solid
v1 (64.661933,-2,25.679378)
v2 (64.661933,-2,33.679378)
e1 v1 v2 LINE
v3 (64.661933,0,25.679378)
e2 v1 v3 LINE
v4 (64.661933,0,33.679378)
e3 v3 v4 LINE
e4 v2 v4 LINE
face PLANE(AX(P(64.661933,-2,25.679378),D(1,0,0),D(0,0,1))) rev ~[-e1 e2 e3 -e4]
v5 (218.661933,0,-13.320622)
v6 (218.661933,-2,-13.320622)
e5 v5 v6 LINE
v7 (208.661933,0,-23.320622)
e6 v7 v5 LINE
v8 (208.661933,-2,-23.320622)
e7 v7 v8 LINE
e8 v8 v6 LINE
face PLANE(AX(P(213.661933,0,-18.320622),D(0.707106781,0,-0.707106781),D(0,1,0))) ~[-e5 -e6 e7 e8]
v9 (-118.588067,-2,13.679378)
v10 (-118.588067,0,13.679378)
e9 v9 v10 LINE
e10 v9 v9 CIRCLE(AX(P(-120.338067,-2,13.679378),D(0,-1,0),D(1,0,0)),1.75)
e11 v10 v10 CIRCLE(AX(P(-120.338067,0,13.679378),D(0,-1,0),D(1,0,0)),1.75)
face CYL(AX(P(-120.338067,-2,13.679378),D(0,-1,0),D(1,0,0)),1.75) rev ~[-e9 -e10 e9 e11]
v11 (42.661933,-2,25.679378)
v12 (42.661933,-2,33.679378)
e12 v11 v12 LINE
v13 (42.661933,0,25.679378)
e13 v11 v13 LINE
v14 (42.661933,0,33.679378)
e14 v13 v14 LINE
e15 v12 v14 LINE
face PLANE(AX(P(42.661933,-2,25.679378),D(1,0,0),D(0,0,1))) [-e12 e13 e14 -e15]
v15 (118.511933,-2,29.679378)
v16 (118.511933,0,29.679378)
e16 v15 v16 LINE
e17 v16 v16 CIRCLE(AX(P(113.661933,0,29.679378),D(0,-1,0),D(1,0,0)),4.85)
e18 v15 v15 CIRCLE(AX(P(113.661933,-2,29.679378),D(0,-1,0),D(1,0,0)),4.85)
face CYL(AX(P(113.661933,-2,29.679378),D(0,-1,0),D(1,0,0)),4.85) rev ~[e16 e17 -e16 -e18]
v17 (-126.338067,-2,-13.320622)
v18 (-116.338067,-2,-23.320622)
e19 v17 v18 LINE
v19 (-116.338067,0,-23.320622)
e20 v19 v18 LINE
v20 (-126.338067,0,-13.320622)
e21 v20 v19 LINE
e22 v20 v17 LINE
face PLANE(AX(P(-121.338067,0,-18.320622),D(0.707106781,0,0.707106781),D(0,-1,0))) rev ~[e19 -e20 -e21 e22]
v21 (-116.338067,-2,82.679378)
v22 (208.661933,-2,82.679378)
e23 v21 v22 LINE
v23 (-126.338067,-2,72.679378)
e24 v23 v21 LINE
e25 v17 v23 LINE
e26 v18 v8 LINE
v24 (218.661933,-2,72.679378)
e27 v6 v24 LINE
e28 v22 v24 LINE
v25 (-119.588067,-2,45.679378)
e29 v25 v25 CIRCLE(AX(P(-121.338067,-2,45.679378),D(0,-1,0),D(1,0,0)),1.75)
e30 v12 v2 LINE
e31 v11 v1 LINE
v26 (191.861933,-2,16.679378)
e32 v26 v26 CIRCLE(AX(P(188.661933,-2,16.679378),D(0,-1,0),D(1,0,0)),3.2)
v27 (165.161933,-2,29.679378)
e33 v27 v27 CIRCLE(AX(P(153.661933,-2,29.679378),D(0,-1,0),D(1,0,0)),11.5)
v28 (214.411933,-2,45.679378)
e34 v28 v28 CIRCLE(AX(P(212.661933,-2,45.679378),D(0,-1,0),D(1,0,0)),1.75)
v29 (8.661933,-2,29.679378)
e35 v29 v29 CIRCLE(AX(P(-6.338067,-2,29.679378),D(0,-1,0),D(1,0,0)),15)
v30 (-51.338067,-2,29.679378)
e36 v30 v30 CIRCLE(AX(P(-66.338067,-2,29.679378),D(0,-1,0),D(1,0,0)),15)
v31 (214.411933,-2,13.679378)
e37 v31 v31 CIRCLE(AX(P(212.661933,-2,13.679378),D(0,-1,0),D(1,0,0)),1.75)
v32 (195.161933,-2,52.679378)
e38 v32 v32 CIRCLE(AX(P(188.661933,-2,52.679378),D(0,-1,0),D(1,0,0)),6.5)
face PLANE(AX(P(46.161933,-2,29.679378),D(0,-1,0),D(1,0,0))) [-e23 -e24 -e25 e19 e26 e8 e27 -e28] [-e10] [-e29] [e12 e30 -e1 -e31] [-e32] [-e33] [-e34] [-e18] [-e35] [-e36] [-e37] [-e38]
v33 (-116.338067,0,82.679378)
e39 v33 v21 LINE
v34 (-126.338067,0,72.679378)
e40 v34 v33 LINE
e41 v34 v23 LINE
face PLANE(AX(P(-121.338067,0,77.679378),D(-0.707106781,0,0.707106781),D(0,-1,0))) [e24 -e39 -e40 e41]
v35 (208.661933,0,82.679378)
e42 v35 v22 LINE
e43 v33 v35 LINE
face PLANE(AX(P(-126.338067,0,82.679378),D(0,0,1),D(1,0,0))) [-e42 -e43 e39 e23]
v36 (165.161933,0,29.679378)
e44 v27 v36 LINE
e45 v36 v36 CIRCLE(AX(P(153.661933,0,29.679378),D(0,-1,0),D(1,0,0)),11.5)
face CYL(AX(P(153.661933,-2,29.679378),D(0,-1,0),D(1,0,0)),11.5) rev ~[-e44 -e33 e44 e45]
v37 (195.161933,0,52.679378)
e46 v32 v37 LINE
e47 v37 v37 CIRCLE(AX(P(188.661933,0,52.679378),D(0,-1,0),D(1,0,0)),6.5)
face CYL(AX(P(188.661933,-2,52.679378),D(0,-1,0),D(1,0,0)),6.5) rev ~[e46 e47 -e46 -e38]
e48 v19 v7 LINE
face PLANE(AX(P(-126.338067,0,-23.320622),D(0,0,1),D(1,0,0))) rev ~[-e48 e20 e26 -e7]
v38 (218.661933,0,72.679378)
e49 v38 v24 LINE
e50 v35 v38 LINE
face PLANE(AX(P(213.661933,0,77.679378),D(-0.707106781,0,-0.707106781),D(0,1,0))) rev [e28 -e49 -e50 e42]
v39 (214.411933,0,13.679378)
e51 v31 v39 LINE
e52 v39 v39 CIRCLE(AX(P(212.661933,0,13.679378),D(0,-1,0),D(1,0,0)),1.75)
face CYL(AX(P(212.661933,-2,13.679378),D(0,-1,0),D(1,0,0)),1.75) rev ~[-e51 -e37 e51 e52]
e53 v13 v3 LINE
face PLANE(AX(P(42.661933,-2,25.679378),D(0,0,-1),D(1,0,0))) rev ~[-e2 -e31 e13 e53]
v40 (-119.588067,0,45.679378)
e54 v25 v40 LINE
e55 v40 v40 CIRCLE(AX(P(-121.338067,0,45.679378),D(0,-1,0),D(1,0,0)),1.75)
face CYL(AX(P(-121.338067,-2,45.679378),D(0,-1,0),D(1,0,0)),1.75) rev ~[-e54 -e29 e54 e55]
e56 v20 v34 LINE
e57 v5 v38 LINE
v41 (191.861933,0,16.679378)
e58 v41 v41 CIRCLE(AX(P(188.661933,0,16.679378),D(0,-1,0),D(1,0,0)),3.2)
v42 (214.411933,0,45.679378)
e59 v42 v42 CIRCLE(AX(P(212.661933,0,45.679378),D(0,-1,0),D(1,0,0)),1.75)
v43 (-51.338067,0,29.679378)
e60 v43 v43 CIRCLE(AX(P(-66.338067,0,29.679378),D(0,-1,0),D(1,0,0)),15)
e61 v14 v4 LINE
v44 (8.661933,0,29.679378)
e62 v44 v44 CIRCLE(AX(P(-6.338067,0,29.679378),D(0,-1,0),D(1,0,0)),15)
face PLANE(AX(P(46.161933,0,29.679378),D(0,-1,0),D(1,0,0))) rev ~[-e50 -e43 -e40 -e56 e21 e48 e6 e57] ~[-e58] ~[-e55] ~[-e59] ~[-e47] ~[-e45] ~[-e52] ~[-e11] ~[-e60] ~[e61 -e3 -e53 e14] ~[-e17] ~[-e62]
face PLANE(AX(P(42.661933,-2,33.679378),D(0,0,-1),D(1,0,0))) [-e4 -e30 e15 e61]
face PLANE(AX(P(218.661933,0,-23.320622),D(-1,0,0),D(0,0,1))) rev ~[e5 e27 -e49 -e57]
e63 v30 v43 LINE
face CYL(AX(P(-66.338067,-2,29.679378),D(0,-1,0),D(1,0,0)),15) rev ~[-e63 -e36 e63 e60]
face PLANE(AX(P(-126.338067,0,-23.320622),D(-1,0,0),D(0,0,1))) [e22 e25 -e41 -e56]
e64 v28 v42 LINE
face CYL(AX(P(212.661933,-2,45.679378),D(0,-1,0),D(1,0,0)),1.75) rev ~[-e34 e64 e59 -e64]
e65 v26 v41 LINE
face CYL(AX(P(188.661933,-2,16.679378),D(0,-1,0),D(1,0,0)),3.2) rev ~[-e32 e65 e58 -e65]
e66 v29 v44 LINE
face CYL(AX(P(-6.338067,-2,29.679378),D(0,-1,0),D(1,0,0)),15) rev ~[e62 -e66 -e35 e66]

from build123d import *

# Parameters (mm, degrees)
F0_W      = 345
F0_H      = 106
F1_DEPTH  = 2
F2_SIZE   = 10
F3_SIZE   = 10
F4_R      = 1.75
F5_DEPTH  = 25
F6_R      = 15
F6_W      = 22
F6_H      = 8
F7_DEPTH  = 25
F9_R      = 6.5
F9_R_2    = 11.5
F9_R_3    = 3.2
F10_DEPTH = 25
F6_R_2    = 4.85
F11_DEPTH = 25


# Not quite as in the source:
# - a feature names something its author has since deleted; it is built from what else it names


with BuildPart() as f1:
    # F0 (on Front) → F1 (new body)
    with BuildSketch(Plane.XZ):
        with Locations((46.1619326359, 29.679378029)):
            Rectangle(F0_W, F0_H)
    extrude(amount=F1_DEPTH)

    # F2
    f2_edges = [f1.edges().sort_by_distance(p)[0] for p in [
        (-126.338067, -1, 82.679378),
    ]]
    chamfer(f2_edges, length=F2_SIZE)

    # F3
    f3_edges = [f1.edges().sort_by_distance(p)[0] for p in [
        (-126.338067, -1, -23.320622),
        (218.661933, -1, -23.320622),
        (218.661933, -1, 82.679378),
    ]]
    chamfer(f3_edges, length=F3_SIZE)

    # F4 (on face) → F5 (cut)
    with BuildSketch(Plane.XZ.offset(2)):
        with Locations((-121.3380673641, 45.679378029)):
            Circle(F4_R)
        with Locations((-120.3380673641, 13.679378029)):
            Circle(F4_R)
        with Locations((212.6619326359, 45.679378029)):
            Circle(F4_R)
        with Locations((212.6619326359, 13.679378029)):
            Circle(F4_R)
    extrude(amount=-F5_DEPTH, mode=Mode.SUBTRACT)

    # F6 (on face) → F7 (cut)
    with BuildSketch(Plane.XZ.offset(2)):
        with Locations((-66.3380673641, 29.679378029)):
            Circle(F6_R)
        with Locations((-6.3380673641, 29.679378029)):
            Circle(F6_R)
        with Locations((53.6619326359, 29.679378029)):
            Rectangle(F6_W, F6_H)
    extrude(amount=-F7_DEPTH, mode=Mode.SUBTRACT)

    # F9 (on face) → F10 (cut)
    with BuildSketch(Plane.XZ.offset(2)):
        with Locations((188.6619326359, 52.679378029)):
            Circle(F9_R)
        with Locations((153.6619326359, 29.679378029)):
            Circle(F9_R_2)
        with Locations((188.6619326359, 16.679378029)):
            Circle(F9_R_3)
    extrude(amount=-F10_DEPTH, mode=Mode.SUBTRACT)

    # F6 (on face) → F11 (cut)
    with BuildSketch(Plane.XZ.offset(2)):
        with Locations((-66.3380673641, 29.679378029)):
            Circle(F6_R)
        with Locations((-6.3380673641, 29.679378029)):
            Circle(F6_R)
        with Locations((53.6619326359, 29.679378029)):
            Rectangle(F6_W, F6_H)
        with Locations((113.6619326359, 29.679378029)):
            Circle(F6_R_2)
    extrude(amount=-F11_DEPTH, mode=Mode.SUBTRACT)


solid = f1.part
